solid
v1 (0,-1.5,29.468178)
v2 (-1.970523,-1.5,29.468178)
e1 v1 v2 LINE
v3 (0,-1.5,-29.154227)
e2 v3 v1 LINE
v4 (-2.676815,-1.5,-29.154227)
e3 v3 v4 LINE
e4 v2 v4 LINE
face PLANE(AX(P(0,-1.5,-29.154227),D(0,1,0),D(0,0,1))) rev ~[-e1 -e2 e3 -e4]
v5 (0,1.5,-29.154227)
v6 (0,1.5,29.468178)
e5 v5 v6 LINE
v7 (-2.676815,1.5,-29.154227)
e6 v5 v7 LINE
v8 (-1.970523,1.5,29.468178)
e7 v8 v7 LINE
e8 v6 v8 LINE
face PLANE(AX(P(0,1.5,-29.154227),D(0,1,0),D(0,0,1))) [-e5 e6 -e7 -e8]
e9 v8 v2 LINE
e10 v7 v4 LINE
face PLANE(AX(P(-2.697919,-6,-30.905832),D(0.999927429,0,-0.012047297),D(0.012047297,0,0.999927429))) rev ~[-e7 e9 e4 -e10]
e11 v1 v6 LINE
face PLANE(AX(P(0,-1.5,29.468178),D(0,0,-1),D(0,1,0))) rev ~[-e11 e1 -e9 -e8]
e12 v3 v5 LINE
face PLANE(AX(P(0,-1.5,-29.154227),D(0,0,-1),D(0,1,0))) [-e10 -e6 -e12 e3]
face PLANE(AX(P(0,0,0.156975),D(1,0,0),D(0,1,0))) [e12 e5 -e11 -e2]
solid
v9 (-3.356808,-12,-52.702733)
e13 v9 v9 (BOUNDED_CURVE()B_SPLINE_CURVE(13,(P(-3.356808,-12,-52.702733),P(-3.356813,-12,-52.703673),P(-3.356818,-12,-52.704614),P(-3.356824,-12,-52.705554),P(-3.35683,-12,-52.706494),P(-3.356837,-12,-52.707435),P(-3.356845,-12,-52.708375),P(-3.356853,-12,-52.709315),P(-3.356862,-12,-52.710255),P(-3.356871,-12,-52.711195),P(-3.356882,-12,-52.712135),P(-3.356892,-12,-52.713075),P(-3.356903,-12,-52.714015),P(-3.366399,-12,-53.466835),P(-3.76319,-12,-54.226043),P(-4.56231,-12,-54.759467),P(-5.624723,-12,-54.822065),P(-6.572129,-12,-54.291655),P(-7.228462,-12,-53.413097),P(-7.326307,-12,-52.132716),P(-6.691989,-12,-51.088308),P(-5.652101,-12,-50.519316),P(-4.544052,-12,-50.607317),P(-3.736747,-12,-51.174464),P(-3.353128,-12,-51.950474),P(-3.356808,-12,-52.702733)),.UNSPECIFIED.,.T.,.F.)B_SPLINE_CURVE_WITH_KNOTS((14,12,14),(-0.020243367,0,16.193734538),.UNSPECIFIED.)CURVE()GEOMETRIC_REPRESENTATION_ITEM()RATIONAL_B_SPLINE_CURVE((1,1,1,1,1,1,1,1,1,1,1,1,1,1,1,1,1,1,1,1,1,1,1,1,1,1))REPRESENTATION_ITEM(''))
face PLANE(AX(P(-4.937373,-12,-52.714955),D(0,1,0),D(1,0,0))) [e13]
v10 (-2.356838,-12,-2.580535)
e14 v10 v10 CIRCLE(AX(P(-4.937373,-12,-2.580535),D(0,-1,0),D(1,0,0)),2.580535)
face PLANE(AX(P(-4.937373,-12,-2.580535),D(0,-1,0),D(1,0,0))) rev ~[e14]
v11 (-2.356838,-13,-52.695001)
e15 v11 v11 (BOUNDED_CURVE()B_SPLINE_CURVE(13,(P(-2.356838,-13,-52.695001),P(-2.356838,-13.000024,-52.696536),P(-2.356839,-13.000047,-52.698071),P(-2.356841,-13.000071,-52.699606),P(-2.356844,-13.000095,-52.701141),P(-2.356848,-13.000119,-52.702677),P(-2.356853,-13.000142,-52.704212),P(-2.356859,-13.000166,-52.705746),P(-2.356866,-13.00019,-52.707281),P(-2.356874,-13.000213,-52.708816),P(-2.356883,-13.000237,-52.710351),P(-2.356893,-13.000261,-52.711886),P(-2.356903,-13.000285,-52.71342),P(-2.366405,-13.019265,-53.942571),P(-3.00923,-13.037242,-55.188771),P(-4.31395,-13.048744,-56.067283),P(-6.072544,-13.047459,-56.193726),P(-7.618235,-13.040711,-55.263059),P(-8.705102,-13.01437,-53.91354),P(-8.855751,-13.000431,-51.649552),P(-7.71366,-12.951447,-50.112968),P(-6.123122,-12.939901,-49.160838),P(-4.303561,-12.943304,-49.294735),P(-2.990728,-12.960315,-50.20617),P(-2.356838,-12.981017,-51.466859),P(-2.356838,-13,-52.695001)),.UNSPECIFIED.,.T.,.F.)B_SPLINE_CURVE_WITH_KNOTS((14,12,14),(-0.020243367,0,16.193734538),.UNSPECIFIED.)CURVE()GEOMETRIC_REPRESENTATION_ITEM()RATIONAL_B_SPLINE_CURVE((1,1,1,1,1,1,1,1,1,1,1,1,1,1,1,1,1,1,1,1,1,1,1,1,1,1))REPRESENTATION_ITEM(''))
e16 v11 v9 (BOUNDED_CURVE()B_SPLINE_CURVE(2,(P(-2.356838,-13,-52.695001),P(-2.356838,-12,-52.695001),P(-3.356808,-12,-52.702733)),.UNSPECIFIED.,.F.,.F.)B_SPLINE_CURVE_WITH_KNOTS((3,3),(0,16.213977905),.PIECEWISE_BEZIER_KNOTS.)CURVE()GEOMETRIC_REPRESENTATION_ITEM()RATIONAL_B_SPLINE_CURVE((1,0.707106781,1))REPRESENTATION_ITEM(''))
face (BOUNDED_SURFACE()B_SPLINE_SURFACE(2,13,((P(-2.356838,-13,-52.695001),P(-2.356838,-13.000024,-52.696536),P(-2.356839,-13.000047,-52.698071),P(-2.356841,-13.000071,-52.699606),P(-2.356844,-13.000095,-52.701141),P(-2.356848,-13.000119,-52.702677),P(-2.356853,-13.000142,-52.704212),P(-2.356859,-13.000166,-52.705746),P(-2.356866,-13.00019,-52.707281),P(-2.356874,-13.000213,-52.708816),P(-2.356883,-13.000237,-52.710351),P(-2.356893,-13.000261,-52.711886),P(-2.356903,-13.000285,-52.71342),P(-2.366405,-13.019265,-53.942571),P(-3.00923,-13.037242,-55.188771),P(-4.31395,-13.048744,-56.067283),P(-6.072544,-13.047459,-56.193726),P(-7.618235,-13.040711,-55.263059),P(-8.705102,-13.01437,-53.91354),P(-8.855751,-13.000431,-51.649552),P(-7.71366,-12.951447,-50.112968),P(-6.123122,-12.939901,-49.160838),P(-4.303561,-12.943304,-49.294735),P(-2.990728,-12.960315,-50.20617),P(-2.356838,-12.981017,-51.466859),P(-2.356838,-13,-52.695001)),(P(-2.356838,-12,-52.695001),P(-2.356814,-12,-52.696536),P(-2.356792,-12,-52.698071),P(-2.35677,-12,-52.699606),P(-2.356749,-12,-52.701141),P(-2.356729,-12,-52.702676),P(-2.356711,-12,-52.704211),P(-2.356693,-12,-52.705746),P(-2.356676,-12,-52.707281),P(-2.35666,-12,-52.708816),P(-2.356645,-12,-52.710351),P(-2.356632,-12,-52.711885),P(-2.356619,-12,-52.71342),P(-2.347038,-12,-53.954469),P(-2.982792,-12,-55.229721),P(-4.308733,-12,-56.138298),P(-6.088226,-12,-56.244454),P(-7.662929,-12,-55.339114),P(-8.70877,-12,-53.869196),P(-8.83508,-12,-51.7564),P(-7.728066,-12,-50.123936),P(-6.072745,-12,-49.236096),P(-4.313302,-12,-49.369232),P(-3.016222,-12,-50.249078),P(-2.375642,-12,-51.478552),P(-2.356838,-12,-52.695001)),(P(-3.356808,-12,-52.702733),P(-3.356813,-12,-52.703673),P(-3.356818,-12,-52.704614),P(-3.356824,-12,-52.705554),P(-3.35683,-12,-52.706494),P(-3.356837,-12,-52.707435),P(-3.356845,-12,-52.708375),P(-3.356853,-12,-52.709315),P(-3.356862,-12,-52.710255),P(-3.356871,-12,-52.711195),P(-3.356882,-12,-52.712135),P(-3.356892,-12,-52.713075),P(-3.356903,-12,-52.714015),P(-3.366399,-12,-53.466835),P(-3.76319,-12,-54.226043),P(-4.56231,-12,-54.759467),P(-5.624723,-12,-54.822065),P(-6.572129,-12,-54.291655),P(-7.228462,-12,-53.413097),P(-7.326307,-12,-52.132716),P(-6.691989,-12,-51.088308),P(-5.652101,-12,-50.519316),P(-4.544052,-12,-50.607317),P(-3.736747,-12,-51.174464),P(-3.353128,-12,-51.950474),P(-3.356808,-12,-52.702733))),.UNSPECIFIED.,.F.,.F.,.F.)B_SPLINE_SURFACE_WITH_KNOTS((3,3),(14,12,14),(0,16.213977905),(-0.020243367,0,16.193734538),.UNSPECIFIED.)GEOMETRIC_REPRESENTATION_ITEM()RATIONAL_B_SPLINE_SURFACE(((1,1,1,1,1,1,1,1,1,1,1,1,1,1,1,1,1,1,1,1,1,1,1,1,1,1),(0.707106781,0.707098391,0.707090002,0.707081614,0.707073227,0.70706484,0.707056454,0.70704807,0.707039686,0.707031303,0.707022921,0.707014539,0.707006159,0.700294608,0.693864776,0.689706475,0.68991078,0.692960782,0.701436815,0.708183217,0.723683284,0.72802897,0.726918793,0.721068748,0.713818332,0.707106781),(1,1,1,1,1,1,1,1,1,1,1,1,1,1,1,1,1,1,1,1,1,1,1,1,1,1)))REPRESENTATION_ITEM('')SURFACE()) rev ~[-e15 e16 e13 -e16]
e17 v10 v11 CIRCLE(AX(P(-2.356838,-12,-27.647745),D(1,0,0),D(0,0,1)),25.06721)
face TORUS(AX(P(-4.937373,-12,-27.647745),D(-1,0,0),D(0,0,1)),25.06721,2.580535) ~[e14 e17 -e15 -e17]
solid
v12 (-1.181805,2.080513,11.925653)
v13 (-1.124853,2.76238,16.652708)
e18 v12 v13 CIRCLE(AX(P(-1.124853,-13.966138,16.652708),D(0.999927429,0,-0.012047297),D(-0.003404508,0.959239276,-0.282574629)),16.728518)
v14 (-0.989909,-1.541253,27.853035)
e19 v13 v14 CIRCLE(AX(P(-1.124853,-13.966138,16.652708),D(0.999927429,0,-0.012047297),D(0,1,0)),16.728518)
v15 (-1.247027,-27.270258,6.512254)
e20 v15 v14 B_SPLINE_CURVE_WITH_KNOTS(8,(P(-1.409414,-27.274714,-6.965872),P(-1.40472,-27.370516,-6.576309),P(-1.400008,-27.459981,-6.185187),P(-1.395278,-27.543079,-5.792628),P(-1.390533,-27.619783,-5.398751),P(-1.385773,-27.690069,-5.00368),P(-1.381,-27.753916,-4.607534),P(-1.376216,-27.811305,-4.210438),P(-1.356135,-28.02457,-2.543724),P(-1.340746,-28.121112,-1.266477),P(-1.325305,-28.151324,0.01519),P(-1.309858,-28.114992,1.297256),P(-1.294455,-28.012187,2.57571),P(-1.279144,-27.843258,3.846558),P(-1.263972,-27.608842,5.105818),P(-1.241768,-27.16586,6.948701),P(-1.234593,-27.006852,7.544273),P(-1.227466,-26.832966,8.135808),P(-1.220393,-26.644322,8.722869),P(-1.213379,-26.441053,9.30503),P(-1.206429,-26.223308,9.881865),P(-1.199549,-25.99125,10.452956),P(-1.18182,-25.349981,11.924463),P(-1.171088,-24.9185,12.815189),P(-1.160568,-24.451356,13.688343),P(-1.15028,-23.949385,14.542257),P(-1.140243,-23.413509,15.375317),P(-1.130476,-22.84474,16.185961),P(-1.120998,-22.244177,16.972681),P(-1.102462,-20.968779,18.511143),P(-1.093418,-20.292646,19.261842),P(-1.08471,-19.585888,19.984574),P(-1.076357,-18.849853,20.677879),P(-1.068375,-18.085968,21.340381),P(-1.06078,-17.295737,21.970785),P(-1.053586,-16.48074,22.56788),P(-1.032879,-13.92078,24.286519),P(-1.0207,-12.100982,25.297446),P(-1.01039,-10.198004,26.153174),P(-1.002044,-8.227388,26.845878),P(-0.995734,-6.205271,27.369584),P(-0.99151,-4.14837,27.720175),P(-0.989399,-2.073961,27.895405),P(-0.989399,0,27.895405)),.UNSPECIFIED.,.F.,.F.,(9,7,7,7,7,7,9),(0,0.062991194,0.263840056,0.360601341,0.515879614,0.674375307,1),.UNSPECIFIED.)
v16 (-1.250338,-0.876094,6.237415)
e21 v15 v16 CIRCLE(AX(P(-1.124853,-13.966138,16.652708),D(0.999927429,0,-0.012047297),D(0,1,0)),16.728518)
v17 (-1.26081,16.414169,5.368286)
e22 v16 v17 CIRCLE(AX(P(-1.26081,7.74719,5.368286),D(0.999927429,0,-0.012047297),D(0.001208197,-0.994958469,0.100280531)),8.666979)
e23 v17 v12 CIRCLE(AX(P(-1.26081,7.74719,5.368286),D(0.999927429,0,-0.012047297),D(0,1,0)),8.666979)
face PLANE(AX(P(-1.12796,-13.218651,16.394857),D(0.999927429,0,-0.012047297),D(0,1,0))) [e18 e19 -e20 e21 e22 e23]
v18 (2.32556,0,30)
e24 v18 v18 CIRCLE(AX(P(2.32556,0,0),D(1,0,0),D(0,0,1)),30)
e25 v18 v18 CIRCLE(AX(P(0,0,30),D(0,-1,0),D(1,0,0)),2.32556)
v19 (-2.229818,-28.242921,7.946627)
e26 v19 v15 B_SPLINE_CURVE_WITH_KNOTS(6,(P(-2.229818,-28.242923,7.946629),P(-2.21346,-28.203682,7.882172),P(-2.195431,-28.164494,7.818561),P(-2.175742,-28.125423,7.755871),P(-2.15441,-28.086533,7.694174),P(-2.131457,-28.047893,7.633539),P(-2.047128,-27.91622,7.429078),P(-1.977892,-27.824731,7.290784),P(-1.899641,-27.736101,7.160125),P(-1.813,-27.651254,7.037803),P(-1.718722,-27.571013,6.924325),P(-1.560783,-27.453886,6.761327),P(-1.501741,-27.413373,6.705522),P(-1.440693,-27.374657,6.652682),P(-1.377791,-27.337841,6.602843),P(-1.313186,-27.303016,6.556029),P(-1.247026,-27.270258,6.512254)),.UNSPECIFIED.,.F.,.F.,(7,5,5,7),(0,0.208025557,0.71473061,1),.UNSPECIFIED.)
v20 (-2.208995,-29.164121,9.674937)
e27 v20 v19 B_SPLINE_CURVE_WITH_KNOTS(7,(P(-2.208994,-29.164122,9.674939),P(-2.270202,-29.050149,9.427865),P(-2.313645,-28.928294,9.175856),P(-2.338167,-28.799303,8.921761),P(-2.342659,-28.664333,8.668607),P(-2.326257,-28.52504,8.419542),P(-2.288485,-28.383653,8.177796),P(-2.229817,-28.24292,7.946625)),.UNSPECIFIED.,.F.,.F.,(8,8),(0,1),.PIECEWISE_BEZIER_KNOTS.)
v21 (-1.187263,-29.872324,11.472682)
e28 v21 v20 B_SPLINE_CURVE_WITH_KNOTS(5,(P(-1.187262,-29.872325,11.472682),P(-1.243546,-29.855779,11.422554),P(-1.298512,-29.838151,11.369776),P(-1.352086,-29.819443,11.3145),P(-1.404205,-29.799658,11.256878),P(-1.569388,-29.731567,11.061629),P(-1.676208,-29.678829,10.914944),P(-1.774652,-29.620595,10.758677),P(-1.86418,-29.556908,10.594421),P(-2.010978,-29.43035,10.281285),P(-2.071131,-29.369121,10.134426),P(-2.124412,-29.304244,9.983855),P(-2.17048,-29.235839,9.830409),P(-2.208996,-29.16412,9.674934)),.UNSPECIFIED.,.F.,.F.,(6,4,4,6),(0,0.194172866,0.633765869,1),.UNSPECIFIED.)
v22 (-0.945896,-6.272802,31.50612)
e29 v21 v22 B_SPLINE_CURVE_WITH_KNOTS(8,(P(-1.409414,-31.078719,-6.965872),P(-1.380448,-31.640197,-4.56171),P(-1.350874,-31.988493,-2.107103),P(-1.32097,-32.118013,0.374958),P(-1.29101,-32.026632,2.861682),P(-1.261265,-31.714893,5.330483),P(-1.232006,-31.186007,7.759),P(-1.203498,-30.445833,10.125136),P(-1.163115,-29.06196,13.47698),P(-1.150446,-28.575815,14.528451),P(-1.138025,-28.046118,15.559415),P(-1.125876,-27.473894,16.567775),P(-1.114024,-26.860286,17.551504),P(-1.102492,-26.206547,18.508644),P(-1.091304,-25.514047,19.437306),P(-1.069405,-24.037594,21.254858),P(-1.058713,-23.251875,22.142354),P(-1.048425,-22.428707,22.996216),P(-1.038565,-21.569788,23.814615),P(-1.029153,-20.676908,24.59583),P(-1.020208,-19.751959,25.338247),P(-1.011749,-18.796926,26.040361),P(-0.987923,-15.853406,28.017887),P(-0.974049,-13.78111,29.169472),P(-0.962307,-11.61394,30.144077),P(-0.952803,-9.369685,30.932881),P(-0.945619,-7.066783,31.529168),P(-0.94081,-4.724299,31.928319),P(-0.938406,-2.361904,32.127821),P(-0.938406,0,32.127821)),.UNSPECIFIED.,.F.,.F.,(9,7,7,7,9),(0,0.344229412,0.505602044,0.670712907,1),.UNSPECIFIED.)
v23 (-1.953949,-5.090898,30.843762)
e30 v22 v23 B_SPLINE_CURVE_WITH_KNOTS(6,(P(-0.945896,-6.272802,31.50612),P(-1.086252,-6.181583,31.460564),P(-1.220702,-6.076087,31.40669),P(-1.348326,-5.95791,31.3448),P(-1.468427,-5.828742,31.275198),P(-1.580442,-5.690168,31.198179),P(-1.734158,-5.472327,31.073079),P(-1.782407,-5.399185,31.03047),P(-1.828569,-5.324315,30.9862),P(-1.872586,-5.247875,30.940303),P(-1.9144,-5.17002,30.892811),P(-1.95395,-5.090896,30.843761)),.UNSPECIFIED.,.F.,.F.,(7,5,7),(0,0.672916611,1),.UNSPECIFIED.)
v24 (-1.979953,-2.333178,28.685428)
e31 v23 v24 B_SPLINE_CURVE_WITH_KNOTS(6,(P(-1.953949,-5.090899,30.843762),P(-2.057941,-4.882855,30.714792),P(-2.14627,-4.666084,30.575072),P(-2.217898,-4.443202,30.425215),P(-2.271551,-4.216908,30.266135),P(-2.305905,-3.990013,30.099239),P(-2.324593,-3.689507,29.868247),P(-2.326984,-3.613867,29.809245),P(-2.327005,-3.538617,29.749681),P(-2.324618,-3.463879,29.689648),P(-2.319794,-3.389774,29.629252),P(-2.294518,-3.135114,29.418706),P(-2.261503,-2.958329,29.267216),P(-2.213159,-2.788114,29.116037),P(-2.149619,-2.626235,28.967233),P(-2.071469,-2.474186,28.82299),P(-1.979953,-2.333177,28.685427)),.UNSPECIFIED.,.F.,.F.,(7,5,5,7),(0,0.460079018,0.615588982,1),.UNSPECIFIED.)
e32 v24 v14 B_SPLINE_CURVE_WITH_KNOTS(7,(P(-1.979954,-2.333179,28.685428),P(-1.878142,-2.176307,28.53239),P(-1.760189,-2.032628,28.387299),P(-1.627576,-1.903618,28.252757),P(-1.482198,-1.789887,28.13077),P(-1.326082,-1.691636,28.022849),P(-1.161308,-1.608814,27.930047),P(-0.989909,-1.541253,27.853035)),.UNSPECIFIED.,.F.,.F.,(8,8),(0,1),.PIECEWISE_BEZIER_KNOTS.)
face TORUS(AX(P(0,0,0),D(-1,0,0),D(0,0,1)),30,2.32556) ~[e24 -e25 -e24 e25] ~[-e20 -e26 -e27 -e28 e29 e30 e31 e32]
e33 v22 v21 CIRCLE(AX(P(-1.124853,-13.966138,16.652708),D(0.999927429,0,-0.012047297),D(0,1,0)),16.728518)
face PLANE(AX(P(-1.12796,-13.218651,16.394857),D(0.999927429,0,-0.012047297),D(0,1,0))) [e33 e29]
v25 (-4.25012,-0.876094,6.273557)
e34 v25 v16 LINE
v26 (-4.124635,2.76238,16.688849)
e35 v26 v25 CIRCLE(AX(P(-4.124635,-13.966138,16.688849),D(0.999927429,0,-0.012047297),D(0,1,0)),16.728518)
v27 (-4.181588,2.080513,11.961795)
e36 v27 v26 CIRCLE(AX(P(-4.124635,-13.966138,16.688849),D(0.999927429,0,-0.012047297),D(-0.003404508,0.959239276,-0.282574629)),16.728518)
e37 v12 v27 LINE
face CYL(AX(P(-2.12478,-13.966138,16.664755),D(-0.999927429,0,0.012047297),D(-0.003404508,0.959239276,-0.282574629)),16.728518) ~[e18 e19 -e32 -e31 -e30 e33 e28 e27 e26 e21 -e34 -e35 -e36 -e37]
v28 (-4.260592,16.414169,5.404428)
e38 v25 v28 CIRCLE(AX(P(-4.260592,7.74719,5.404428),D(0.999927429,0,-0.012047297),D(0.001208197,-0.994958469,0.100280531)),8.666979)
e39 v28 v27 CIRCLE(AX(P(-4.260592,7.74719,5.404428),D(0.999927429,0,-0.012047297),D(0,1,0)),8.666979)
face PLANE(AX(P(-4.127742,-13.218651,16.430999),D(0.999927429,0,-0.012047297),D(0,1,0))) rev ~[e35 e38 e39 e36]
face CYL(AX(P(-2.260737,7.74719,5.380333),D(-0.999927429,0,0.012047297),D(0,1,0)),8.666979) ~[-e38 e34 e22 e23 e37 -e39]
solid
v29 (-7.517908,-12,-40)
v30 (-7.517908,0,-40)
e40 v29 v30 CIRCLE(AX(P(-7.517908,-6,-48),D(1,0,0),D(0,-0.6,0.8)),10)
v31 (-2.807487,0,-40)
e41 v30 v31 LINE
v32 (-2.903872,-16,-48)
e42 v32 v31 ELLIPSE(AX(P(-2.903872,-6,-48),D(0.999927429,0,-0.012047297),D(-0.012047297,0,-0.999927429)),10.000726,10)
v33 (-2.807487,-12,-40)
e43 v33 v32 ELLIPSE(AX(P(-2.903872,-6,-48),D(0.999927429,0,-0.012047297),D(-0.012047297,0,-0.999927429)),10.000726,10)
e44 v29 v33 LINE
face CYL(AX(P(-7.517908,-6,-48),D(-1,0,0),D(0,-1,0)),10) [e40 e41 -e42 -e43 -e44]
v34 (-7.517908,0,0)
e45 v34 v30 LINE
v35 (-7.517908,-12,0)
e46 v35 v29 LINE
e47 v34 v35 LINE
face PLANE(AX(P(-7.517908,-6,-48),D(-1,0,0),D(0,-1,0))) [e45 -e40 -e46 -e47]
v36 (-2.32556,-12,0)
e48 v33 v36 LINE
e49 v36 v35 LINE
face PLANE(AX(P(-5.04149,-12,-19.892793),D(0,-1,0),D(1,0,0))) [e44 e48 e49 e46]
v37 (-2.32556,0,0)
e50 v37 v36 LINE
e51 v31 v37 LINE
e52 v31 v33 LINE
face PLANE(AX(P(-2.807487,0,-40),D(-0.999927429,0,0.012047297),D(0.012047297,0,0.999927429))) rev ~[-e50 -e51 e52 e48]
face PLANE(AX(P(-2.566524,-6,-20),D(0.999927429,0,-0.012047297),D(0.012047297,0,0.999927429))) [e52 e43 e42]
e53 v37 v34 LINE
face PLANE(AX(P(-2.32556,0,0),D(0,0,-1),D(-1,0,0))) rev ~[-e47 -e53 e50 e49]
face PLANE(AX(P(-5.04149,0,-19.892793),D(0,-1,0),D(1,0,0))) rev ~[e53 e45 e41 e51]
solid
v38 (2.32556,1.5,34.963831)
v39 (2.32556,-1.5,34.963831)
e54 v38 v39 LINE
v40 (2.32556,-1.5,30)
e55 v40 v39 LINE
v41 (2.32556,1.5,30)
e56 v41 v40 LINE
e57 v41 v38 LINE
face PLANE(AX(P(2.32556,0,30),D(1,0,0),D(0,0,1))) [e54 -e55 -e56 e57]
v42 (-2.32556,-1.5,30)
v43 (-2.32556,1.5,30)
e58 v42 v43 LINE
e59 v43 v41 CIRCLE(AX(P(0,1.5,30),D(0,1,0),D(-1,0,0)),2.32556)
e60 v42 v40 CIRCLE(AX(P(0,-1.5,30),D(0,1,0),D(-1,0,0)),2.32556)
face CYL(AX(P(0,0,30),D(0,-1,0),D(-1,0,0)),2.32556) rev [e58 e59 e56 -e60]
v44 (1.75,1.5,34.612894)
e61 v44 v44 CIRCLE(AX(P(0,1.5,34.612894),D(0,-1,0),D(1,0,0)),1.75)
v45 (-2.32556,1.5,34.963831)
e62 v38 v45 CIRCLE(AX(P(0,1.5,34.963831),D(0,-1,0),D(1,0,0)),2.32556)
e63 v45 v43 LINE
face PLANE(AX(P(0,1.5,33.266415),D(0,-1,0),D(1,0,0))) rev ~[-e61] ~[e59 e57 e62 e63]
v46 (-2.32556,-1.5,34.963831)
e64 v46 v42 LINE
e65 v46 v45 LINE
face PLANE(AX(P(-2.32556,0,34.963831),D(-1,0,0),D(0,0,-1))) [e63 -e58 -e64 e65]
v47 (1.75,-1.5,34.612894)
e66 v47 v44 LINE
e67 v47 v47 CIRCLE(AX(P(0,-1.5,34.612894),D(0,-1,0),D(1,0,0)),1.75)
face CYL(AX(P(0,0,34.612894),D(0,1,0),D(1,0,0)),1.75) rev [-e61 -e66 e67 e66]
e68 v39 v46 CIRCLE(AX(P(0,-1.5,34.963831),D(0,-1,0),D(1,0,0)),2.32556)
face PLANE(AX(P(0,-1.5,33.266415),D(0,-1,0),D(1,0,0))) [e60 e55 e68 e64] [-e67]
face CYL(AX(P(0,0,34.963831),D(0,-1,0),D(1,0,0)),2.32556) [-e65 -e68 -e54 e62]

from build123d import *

# Parameters (mm, degrees)
F0_R          = 2.3255601838
F3_DEPTH      = 12
F4_R          = 10
F5_REACH      = 38.1287390872
F6_R          = 2.5805347307
F7_ANGLE      = 180
F9_DEPTH      = 2
F9_DEPTH_BACK = 1
F10_W         = 3
F10_H         = 58.6224048207
F11_REACH     = 66.2180248443
F13_R         = 1
F12_R         = 1.75
F14_DEPTH     = 1.5


with BuildPart() as f1:
    # F0 (on Front) → F1 (revolve)
    with BuildSketch(Plane.XZ):
        with Locations((0, 30)):
            Circle(F0_R)
    revolve(axis=Axis((-0.4632313671, 0, 0), (1, 0, 0)))

    # F8 (on face) → F9 (join, two sides)
    with BuildSketch(Plane(origin=(-2.3252226581, 0, 0.0280146809), x_dir=(0, 1, 0), z_dir=(0.9999274287, 0, -0.0120472969))) as f9_sk:
        with BuildLine():
            ThreePointArc((2.0805130523, 11.9105497142), (2.5910354273, 14.2497875874), (2.7623795628, 16.6379475716))
            ThreePointArc((2.7623795628, 16.6379475716), (-29.7588639596, 22.1545713112), (-0.8760942598, 6.2218994639))
            ThreePointArc((-0.8760942598, 6.2218994639), (0.0568757564, 9.3496551669), (2.0805130523, 11.9105497142))
        make_face()
        with BuildLine():
            ThreePointArc((2.0805130523, 11.9105497142), (0.8772757251, 8.9232621844), (-0.8760942598, 6.2218994639))
            ThreePointArc((-0.8760942598, 6.2218994639), (7.312045103, -3.303341458), (16.4141692485, 5.3527071141))
            ThreePointArc((16.4141692485, 5.3527071141), (11.3529879248, 13.2339982443), (2.0805130523, 11.9105497142))
        make_face()
        with BuildLine():
            ThreePointArc((2.0805130523, 11.9105497142), (0.0568757564, 9.3496551669), (-0.8760942598, 6.2218994639))
            ThreePointArc((-0.8760942598, 6.2218994639), (0.8772757251, 8.9232621844), (2.0805130523, 11.9105497142))
        make_face()
    extrude(amount=-F9_DEPTH)
    extrude(f9_sk.sketch, amount=F9_DEPTH_BACK)


with BuildPart() as f3:
    # F2 (on Front) → F3 (new body)
    with BuildSketch(Plane.XZ):
        Polygon((-2.8074870352, -40), (-2.3255601838, 0), (-7.5179076559, 0), (-7.5179076559, -40), align=None)
    extrude(amount=F3_DEPTH)

    f5_end = Plane(origin=(-2.5665236095, -6, -20), x_dir=(0.0120472969, 0, 0.9999274287), z_dir=(0.9999274287, 0, -0.0120472969))
    # F4 (on face) → F5 (join, up to a plane its end follows)
    with BuildSketch(Plane(origin=(-7.5179076559, 0, 0), x_dir=(0, -1, 0), z_dir=(-1, 0, 0))):
        with Locations((6, -48)):
            Circle(F4_R)
    f5_long = extrude(amount=-F5_REACH, mode=Mode.PRIVATE)
    add(split(f5_long, bisect_by=f5_end, keep=Keep.BOTTOM, mode=Mode.PRIVATE))


with BuildPart() as f7:
    # F6 (on face) → F7 (revolve)
    with BuildSketch(Plane.XZ.offset(12)):
        with Locations((-4.9373729253, -2.5805347307)):
            Circle(F6_R)
    revolve(axis=Axis((0.6807111204, -12, -27.6477448642), (1, 0, 0)), revolution_arc=F7_ANGLE)

    # F13
    f13_edges = [f7.edges().sort_by_distance(p)[0] for p in [
        (-7.517908, -12, -52.714955),
    ]]
    fillet(f13_edges, radius=F13_R)


with BuildPart() as f11:
    f11_end = Plane(origin=(-2.697918947, -6, -30.9058324611), x_dir=(0.0120472969, 0, 0.9999274287), z_dir=(0.9999274287, 0, -0.0120472969))
    # F10 (on Right) → F11 (new body, up to a plane its end follows)
    with BuildSketch(Plane.YZ):
        with Locations((0, 0.1569753513)):
            Rectangle(F10_W, F10_H)
    f11_long = extrude(amount=-F11_REACH, mode=Mode.PRIVATE)
    add(split(f11_long, bisect_by=f11_end, keep=Keep.TOP, mode=Mode.PRIVATE))


with BuildPart() as f14:
    # F12 (on Front) → F14 (new body, symmetric)
    with BuildSketch(Plane.XZ):
        with BuildLine():
            ThreePointArc((-2.3255601838, 30), (0, 32.3255601838), (2.3255601838, 30))
            Line((2.3255601838, 30), (2.3255601838, 34.9638313055))
            ThreePointArc((2.3255601838, 34.9638313055), (0, 37.2893914893), (-2.3255601838, 34.9638313055))
            Line((-2.3255601838, 34.9638313055), (-2.3255601838, 30))
        make_face()
        with Locations((0, 34.6128940582)):
            Circle(F12_R, mode=Mode.SUBTRACT)
    extrude(amount=F14_DEPTH, both=True)


solid = Compound([f1.part, f3.part, f7.part, f11.part, f14.part])
